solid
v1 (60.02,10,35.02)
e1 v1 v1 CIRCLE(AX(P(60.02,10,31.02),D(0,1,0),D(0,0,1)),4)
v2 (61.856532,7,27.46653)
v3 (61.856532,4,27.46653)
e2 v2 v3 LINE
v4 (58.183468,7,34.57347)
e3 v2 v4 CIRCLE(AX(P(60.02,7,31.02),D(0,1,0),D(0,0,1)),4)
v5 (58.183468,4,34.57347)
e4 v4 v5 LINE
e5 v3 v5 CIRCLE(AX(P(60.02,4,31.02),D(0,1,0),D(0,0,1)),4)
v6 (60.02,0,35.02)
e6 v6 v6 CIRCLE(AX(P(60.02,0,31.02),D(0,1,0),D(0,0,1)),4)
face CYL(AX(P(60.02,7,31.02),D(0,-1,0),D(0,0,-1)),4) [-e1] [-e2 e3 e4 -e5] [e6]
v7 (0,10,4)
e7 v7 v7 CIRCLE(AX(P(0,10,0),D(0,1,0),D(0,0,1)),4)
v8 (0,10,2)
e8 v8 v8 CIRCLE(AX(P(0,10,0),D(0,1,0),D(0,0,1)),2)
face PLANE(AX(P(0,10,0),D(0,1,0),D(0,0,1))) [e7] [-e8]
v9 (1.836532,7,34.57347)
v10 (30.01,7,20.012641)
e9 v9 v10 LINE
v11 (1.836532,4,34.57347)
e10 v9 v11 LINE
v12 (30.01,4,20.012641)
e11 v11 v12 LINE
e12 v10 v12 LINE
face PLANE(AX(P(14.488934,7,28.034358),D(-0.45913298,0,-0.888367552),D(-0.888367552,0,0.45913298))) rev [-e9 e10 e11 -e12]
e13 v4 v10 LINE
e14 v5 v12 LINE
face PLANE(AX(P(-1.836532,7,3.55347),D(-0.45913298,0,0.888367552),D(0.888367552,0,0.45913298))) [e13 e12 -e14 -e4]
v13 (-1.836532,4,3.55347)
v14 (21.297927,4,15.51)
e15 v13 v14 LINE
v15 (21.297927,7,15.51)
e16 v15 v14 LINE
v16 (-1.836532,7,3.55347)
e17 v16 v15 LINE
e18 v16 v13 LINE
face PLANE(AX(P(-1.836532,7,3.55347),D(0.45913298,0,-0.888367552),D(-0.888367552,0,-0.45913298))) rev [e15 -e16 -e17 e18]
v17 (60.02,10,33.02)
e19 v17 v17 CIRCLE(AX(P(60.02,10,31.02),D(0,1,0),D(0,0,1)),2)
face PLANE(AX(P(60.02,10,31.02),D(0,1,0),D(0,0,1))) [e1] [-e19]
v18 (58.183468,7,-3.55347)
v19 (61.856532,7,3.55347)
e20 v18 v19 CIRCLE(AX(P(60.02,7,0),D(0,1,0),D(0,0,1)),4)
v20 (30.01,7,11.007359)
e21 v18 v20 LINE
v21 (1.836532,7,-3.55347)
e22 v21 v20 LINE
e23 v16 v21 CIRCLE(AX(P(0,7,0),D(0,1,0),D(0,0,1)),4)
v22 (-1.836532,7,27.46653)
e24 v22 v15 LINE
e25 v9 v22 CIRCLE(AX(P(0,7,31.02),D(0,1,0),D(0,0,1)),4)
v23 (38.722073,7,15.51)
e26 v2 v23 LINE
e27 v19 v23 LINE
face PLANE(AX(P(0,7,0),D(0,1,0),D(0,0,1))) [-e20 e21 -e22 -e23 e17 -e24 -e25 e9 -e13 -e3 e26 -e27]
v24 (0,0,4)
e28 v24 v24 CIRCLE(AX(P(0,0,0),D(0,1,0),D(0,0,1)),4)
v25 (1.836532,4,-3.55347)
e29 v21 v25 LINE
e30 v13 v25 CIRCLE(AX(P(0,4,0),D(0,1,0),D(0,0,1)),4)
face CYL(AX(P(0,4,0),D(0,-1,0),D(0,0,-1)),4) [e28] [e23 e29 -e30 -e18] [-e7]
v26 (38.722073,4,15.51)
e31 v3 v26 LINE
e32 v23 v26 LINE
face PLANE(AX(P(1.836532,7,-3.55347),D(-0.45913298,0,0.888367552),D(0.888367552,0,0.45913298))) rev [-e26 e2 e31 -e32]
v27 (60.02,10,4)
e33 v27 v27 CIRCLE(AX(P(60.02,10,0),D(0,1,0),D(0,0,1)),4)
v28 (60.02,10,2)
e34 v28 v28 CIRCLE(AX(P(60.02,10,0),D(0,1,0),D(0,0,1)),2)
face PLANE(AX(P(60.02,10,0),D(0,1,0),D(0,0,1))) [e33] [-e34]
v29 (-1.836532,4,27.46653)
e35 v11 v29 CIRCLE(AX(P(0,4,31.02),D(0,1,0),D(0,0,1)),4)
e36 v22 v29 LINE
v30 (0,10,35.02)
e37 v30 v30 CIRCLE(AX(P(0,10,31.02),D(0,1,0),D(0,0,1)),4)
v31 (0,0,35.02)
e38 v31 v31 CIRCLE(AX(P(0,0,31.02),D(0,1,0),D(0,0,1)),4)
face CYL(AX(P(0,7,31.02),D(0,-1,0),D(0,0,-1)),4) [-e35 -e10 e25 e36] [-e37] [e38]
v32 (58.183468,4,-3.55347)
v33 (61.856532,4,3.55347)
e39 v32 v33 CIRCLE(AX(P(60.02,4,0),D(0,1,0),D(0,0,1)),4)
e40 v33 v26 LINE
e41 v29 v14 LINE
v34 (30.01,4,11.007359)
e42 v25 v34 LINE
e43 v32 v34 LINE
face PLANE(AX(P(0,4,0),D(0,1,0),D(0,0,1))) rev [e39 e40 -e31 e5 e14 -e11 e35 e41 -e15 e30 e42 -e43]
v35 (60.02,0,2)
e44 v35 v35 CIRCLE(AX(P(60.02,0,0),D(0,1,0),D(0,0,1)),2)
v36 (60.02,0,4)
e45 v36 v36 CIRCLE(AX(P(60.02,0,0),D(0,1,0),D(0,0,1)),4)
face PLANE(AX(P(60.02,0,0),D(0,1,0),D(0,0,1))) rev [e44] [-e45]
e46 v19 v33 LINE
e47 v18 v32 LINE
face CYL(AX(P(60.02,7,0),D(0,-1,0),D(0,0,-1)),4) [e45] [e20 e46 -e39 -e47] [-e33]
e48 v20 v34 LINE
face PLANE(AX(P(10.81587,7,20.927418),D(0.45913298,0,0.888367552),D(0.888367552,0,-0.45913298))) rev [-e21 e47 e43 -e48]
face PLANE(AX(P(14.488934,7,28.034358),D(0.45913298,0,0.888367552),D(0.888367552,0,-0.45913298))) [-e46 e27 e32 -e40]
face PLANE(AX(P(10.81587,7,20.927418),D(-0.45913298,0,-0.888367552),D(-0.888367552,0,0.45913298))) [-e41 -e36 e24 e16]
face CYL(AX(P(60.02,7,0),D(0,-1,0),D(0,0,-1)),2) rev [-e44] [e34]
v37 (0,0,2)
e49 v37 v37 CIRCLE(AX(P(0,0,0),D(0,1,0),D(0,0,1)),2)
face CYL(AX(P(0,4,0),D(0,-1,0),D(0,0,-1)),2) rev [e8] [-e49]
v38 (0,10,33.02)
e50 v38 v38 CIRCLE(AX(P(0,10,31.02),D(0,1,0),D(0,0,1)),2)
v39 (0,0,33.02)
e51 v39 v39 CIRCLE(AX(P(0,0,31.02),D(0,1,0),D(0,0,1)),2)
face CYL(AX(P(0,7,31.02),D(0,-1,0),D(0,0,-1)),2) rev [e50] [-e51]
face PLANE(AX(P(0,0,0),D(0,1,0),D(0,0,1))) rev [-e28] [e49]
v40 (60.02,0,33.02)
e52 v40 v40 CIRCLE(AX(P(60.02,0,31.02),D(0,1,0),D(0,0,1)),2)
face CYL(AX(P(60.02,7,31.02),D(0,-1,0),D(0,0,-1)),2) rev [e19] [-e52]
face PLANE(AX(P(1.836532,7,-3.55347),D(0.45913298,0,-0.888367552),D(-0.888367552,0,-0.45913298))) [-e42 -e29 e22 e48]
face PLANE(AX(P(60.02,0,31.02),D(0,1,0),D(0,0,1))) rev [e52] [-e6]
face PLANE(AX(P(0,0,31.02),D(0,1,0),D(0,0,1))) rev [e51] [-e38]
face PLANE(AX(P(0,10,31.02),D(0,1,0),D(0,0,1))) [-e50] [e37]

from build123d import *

# Parameters (mm, degrees)
CROQUIS1_R                = 4
CROQUIS1_R_2              = 2
SALIENTE_EXTRUIR1_DEPTH   = 4
SALIENTE_EXTRUIR1_2_DEPTH = 4
SALIENTE_EXTRUIR1_3_DEPTH = 4
SALIENTE_EXTRUIR1_4_DEPTH = 4
SALIENTE_EXTRUIR1_5_DEPTH = 4
CROQUIS3_R                = 2
SALIENTE_EXTRUIR4_DEPTH   = 3
CROQUIS4_R                = 4
CROQUIS4_R_2              = 2
CORTAR_EXTRUIR1_DEPTH     = 4
CROQUIS5_R                = 2
SALIENTE_EXTRUIR5_DEPTH   = 3
CROQUIS6_R                = 4
CROQUIS6_R_2              = 2
SALIENTE_EXTRUIR6_DEPTH   = 3


with BuildPart() as part:
    # Croquis1 → Saliente-Extruir1 (new body)
    with BuildSketch(Plane(origin=(0, 0, 0), x_dir=(1, 0, 0), z_dir=(0, 1, 0))):
        Circle(CROQUIS1_R)
        Circle(CROQUIS1_R_2, mode=Mode.SUBTRACT)
    extrude(amount=SALIENTE_EXTRUIR1_DEPTH)



with BuildPart() as body_2:
    # Croquis1 → Saliente-Extruir1 2 (new body)
    with BuildSketch(Plane(origin=(0, 0, 0), x_dir=(1, 0, 0), z_dir=(0, 1, 0))):
        with Locations((60.02, 0)):
            Circle(CROQUIS1_R)
        with Locations((60.02, 0)):
            Circle(CROQUIS1_R_2, mode=Mode.SUBTRACT)
    extrude(amount=SALIENTE_EXTRUIR1_2_DEPTH)


with BuildPart() as body_3:
    # Croquis1 → Saliente-Extruir1 3 (new body)
    with BuildSketch(Plane(origin=(0, 0, 0), x_dir=(1, 0, 0), z_dir=(0, 1, 0))):
        with Locations((60.02, -31.02)):
            Circle(CROQUIS1_R)
        with Locations((60.02, -31.02)):
            Circle(CROQUIS1_R_2, mode=Mode.SUBTRACT)
    extrude(amount=SALIENTE_EXTRUIR1_3_DEPTH)


with BuildPart() as body_4:
    # Croquis1 → Saliente-Extruir1 4 (new body)
    with BuildSketch(Plane(origin=(0, 0, 0), x_dir=(1, 0, 0), z_dir=(0, 1, 0))):
        with Locations((0, -31.02)):
            Circle(CROQUIS1_R)
        with Locations((0, -31.02)):
            Circle(CROQUIS1_R_2, mode=Mode.SUBTRACT)
    extrude(amount=SALIENTE_EXTRUIR1_4_DEPTH)


with BuildPart() as body_5:
    # Croquis1 → Saliente-Extruir1 5 (new body)
    with BuildSketch(Plane(origin=(0, 0, 0), x_dir=(1, 0, 0), z_dir=(0, 1, 0))):
        with Locations((30.01, -15.51)):
            Circle(CROQUIS1_R)
        with Locations((30.01, -15.51)):
            Circle(CROQUIS1_R_2, mode=Mode.SUBTRACT)
    extrude(amount=SALIENTE_EXTRUIR1_5_DEPTH)

    # Croquis4 → Cortar-Extruir1 (cut)
    with BuildSketch(Plane.XZ):
        with Locations((30.01, 15.51)):
            Circle(CROQUIS4_R)
        with Locations((30.01, 15.51)):
            Circle(CROQUIS4_R_2, mode=Mode.SUBTRACT)
    extrude(amount=-CORTAR_EXTRUIR1_DEPTH, mode=Mode.SUBTRACT)


with BuildPart() as part_1:
    add(part.part)

    add(body_4.part)  # Saliente-Extruir4 merges body 4

    add(body_2.part)  # Saliente-Extruir4 merges body 2

    add(body_3.part)  # Saliente-Extruir4 merges body 3
    # Croquis3 → Saliente-Extruir4 (add)
    with BuildSketch(Plane(origin=(0, 4, 0), x_dir=(1, 0, 0), z_dir=(0, 1, 0))):
        with BuildLine():
            Line((21.297927081, -15.51), (-1.836531919, -27.466529793))
            ThreePointArc((-1.836531919, -27.466529793), (-3.553470207, -32.856531919), (1.836531919, -34.573470207))
            Line((1.836531919, -34.573470207), (30.01, -20.012640819))
            Line((30.01, -20.012640819), (58.183468081, -34.573470207))
            ThreePointArc((58.183468081, -34.573470207), (63.573470207, -32.856531919), (61.856531919, -27.466529793))
            Line((61.856531919, -27.466529793), (38.722072919, -15.51))
            Line((38.722072919, -15.51), (61.856531919, -3.553470207))
            ThreePointArc((61.856531919, -3.553470207), (63.573470207, 1.836531919), (58.183468081, 3.553470207))
            Line((58.183468081, 3.553470207), (30.01, -11.007359181))
            Line((30.01, -11.007359181), (1.836531919, 3.553470207))
            ThreePointArc((1.836531919, 3.553470207), (-3.553470207, 1.836531919), (-1.836531919, -3.553470207))
            Line((-1.836531919, -3.553470207), (21.297927081, -15.51))
        make_face()
        with BuildLine():
            ThreePointArc((28.01, -15.51), (28.595786438, -14.095786438), (30.01, -13.51))
            ThreePointArc((30.01, -13.51), (31.424213562, -16.924213562), (28.01, -15.51))
        make_face(mode=Mode.SUBTRACT)
        with Locations((0, -31.02)):
            Circle(CROQUIS3_R, mode=Mode.SUBTRACT)
        Circle(CROQUIS3_R, mode=Mode.SUBTRACT)
        with Locations((60.02, 0)):
            Circle(CROQUIS3_R, mode=Mode.SUBTRACT)
        with Locations((60.02, -31.02)):
            Circle(CROQUIS3_R, mode=Mode.SUBTRACT)
    extrude(amount=SALIENTE_EXTRUIR4_DEPTH)

    # Croquis5 → Saliente-Extruir5 (add)
    with BuildSketch(Plane.XZ.offset(-4)):
        with Locations((30.01, 15.51)):
            Circle(CROQUIS5_R)
    extrude(amount=-SALIENTE_EXTRUIR5_DEPTH)

    # Croquis6 → Saliente-Extruir6 (add)
    # profile 1 of 4: a face of its own
    with BuildSketch(Plane(origin=(0, 7, 0), x_dir=(1, 0, 0), z_dir=(0, 1, 0))):
        with Locations((60.02, 0)):
            Circle(CROQUIS6_R)
        with Locations((60.02, 0)):
            Circle(CROQUIS6_R_2, mode=Mode.SUBTRACT)
    # profile 2 of 4: a face of its own
    with BuildSketch(Plane(origin=(0, 7, 0), x_dir=(1, 0, 0), z_dir=(0, 1, 0))):
        Circle(CROQUIS6_R)
        Circle(CROQUIS6_R_2, mode=Mode.SUBTRACT)
    # profile 3 of 4: a face of its own
    with BuildSketch(Plane(origin=(0, 7, 0), x_dir=(1, 0, 0), z_dir=(0, 1, 0))):
        with Locations((0, -31.02)):
            Circle(CROQUIS6_R)
        with Locations((0, -31.02)):
            Circle(CROQUIS6_R_2, mode=Mode.SUBTRACT)
    # profile 4 of 4: a face of its own
    with BuildSketch(Plane(origin=(0, 7, 0), x_dir=(1, 0, 0), z_dir=(0, 1, 0))):
        with Locations((60.02, -31.02)):
            Circle(CROQUIS6_R)
        with Locations((60.02, -31.02)):
            Circle(CROQUIS6_R_2, mode=Mode.SUBTRACT)
    extrude(amount=SALIENTE_EXTRUIR6_DEPTH)


solid = part_1.part
